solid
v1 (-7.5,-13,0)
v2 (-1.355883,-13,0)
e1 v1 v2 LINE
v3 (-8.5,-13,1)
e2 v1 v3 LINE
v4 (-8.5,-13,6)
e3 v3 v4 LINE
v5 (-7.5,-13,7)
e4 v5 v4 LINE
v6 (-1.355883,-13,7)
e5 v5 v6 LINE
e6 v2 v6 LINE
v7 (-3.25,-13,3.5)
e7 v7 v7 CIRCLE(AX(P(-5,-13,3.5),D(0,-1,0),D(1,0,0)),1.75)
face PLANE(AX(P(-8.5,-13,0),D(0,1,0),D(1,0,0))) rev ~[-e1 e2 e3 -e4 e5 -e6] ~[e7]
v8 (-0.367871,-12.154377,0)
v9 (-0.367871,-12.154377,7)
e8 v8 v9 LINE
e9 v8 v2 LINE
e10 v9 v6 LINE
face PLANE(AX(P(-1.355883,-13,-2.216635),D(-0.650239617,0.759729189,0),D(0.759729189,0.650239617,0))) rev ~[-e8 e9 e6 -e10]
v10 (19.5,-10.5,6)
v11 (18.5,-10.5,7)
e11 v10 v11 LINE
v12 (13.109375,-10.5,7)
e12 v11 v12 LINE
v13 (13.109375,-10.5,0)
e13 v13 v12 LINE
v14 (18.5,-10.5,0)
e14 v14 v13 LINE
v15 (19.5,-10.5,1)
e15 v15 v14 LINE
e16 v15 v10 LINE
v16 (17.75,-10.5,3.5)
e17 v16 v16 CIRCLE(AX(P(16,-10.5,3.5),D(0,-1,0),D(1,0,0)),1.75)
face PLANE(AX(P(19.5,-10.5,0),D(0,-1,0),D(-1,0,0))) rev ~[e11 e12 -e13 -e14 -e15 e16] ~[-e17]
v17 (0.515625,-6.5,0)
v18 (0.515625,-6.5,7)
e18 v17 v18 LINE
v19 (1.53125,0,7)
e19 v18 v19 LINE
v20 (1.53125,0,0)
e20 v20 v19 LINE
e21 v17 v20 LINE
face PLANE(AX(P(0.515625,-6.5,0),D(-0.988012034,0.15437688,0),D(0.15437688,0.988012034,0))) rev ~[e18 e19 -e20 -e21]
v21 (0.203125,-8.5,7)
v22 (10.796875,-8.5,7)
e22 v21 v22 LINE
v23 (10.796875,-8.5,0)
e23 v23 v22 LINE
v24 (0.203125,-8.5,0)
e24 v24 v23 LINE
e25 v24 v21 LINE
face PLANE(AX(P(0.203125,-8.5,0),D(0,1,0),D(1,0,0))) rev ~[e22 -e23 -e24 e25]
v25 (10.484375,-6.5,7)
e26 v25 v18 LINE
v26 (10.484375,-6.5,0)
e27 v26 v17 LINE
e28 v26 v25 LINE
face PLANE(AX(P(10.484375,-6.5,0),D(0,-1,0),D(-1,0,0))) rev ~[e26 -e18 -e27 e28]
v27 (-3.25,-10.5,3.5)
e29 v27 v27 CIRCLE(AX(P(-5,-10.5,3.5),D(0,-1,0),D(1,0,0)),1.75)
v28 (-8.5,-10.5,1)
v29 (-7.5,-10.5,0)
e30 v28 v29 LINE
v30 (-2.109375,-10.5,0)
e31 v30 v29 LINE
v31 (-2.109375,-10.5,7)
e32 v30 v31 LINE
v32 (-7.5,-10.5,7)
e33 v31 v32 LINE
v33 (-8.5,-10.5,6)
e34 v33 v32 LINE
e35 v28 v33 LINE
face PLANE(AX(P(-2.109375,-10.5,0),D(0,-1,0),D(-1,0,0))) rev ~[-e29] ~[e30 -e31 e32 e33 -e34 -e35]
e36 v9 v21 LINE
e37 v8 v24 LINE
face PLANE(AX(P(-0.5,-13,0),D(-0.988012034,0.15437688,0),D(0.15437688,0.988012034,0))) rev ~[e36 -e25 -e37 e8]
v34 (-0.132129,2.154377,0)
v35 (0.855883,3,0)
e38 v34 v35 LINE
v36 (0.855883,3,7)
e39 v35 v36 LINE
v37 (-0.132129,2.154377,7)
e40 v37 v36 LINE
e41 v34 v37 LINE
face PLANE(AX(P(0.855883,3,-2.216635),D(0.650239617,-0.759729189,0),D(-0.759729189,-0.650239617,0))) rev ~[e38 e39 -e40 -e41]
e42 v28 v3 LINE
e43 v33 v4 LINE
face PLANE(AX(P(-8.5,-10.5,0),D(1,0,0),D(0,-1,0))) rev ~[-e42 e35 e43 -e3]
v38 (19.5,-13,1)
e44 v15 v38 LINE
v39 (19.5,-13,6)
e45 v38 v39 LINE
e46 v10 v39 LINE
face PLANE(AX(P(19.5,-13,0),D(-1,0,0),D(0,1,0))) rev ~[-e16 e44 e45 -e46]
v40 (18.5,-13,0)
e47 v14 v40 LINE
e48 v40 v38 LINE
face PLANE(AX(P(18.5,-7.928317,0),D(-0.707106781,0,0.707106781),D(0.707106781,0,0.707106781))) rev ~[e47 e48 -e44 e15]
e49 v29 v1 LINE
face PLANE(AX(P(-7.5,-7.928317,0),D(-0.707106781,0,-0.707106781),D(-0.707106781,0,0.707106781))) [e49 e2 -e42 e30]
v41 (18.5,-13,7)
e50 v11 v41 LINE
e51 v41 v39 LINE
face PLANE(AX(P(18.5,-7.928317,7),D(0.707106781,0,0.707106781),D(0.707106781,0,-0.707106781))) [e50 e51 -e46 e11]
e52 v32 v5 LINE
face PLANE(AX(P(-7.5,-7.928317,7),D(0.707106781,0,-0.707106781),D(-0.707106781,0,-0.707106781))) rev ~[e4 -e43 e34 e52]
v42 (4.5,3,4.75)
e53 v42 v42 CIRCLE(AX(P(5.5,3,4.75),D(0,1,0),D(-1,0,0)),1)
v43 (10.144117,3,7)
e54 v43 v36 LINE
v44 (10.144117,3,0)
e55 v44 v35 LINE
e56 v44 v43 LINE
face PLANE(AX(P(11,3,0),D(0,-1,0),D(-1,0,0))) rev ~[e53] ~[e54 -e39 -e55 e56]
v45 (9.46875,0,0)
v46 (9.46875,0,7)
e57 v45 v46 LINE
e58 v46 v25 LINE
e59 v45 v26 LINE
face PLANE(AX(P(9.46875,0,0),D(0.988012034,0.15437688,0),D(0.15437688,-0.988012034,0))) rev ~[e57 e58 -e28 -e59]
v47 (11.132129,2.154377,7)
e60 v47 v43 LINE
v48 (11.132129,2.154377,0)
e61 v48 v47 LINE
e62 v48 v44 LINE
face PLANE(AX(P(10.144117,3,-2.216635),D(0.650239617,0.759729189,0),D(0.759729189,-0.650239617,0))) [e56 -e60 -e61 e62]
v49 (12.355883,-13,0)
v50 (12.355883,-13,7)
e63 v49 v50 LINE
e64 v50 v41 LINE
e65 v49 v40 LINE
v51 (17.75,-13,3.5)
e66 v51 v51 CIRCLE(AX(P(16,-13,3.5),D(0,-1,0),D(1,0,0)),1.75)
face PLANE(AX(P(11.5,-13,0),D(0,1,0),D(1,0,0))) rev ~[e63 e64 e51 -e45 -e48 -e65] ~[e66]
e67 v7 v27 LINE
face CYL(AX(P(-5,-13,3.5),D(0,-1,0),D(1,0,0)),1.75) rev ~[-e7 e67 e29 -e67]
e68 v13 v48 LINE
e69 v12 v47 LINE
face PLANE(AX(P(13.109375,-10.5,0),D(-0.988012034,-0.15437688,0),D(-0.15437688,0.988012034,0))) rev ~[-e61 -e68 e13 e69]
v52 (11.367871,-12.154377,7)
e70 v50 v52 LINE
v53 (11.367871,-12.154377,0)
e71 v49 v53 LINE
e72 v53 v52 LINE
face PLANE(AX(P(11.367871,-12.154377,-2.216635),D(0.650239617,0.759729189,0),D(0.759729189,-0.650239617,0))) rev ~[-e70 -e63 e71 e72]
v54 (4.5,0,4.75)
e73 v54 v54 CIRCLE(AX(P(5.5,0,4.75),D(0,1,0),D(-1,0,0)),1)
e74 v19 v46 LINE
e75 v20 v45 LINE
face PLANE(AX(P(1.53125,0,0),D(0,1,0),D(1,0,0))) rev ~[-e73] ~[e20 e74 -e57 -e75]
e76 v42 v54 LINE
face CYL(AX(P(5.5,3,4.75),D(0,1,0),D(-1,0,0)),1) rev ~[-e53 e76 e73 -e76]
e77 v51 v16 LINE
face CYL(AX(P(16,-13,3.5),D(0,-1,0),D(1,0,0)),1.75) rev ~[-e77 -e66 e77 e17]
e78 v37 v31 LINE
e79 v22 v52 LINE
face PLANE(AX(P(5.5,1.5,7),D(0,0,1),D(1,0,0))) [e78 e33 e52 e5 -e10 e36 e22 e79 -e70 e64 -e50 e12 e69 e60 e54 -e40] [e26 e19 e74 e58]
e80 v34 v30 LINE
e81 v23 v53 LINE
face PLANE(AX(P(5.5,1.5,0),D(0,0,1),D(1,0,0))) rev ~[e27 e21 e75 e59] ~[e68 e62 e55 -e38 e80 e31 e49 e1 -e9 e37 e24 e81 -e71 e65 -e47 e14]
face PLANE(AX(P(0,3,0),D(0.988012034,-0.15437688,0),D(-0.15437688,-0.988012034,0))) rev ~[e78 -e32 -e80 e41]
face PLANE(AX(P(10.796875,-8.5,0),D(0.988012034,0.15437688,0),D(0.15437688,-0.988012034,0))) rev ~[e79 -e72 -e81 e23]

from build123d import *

# Parameters (mm, degrees)
F1_DEPTH    = 7
F2_R        = 1.75
F3_DEPTH    = 2.5
F4_R        = 1
F5_DEPTH    = 3
F6_T1_DEPTH = 7.6433659759
F6_T3_DEPTH = 11.4332708022


# Not quite as in the source:
# - a fillet or chamfer that OpenCascade refuses, or shapes differently, is made with other operations: its cross-section is extruded or revolved along the edge and cut away or added


with BuildPart() as f1:
    # F0 (on Top) → F1 (new body)
    with BuildSketch(Plane.XY):
        Polygon((0, 3), (0, 0), (1.53125, 0), (9.46875, 0), (11, 0), (11, 3), align=None)
        Polygon((1.53125, 0), (0, 0), (0, 3), (-2.109375, -10.5), (-2.5, -13), (-0.5, -13), (0.203125, -8.5), (0.515625, -6.5), align=None)
        Polygon((10.484375, -6.5), (0.515625, -6.5), (0.203125, -8.5), (10.796875, -8.5), align=None)
        Polygon((11, 0), (9.46875, 0), (10.484375, -6.5), (10.796875, -8.5), (11.5, -13), (13.5, -13), (13.109375, -10.5), (11, 3), align=None)
        Polygon((19.5, -10.5), (13.109375, -10.5), (13.5, -13), (19.5, -13), align=None)
        Polygon((-2.5, -13), (-2.109375, -10.5), (-8.5, -10.5), (-8.5, -13), align=None)
    extrude(amount=F1_DEPTH)

    # F2 (on face) → F3 (cut, through all)
    with BuildSketch(Plane.XZ.offset(13)):
        with Locations((-5, 3.5)):
            Circle(F2_R)
        with Locations((16, 3.5)):
            Circle(F2_R)
    extrude(amount=-F3_DEPTH, mode=Mode.SUBTRACT)

    # F4 (on face) → F5 (cut, through all)
    with BuildSketch(Plane(origin=(0, 3, 0), x_dir=(-1, 0, 0), z_dir=(0, 1, 0))):
        with Locations((-5.5, 4.75)):
            Circle(F4_R)
    extrude(amount=-F5_DEPTH, mode=Mode.SUBTRACT)

    # F6: chamfer of 1 on 8 edges, made by hand

    # F6_s2 → F6_t1 (cut)
    with BuildSketch(Plane.XZ.offset(7.928317012)):
        Polygon((-7.5, 7), (-8.5, 6), (-8.5, 7), align=None)
        Polygon((-7.5, 0), (-8.5, 1), (-8.5, 0), align=None)
        Polygon((18.5, 7), (19.5, 6), (19.5, 7), align=None)
        Polygon((18.5, 0), (19.5, 1), (19.5, 0), align=None)
    extrude(amount=F6_T1_DEPTH, mode=Mode.SUBTRACT)

    # F6_s4 → F6_t3 (cut)
    with BuildSketch(Plane.XY.offset(-2.2166354011)):
        Polygon((0.8558834213, 3), (-0.1321286125, 2.1543768803), (0, 3), align=None)
        Polygon((10.1441165787, 3), (11.1321286125, 2.1543768803), (11, 3), align=None)
        Polygon((-1.3558834213, -13), (-0.3678713875, -12.1543768803), (-0.5, -13), align=None)
        Polygon((11.3678713875, -12.1543768803), (12.3558834213, -13), (11.5, -13), align=None)
    extrude(amount=F6_T3_DEPTH, mode=Mode.SUBTRACT)


solid = f1.part
